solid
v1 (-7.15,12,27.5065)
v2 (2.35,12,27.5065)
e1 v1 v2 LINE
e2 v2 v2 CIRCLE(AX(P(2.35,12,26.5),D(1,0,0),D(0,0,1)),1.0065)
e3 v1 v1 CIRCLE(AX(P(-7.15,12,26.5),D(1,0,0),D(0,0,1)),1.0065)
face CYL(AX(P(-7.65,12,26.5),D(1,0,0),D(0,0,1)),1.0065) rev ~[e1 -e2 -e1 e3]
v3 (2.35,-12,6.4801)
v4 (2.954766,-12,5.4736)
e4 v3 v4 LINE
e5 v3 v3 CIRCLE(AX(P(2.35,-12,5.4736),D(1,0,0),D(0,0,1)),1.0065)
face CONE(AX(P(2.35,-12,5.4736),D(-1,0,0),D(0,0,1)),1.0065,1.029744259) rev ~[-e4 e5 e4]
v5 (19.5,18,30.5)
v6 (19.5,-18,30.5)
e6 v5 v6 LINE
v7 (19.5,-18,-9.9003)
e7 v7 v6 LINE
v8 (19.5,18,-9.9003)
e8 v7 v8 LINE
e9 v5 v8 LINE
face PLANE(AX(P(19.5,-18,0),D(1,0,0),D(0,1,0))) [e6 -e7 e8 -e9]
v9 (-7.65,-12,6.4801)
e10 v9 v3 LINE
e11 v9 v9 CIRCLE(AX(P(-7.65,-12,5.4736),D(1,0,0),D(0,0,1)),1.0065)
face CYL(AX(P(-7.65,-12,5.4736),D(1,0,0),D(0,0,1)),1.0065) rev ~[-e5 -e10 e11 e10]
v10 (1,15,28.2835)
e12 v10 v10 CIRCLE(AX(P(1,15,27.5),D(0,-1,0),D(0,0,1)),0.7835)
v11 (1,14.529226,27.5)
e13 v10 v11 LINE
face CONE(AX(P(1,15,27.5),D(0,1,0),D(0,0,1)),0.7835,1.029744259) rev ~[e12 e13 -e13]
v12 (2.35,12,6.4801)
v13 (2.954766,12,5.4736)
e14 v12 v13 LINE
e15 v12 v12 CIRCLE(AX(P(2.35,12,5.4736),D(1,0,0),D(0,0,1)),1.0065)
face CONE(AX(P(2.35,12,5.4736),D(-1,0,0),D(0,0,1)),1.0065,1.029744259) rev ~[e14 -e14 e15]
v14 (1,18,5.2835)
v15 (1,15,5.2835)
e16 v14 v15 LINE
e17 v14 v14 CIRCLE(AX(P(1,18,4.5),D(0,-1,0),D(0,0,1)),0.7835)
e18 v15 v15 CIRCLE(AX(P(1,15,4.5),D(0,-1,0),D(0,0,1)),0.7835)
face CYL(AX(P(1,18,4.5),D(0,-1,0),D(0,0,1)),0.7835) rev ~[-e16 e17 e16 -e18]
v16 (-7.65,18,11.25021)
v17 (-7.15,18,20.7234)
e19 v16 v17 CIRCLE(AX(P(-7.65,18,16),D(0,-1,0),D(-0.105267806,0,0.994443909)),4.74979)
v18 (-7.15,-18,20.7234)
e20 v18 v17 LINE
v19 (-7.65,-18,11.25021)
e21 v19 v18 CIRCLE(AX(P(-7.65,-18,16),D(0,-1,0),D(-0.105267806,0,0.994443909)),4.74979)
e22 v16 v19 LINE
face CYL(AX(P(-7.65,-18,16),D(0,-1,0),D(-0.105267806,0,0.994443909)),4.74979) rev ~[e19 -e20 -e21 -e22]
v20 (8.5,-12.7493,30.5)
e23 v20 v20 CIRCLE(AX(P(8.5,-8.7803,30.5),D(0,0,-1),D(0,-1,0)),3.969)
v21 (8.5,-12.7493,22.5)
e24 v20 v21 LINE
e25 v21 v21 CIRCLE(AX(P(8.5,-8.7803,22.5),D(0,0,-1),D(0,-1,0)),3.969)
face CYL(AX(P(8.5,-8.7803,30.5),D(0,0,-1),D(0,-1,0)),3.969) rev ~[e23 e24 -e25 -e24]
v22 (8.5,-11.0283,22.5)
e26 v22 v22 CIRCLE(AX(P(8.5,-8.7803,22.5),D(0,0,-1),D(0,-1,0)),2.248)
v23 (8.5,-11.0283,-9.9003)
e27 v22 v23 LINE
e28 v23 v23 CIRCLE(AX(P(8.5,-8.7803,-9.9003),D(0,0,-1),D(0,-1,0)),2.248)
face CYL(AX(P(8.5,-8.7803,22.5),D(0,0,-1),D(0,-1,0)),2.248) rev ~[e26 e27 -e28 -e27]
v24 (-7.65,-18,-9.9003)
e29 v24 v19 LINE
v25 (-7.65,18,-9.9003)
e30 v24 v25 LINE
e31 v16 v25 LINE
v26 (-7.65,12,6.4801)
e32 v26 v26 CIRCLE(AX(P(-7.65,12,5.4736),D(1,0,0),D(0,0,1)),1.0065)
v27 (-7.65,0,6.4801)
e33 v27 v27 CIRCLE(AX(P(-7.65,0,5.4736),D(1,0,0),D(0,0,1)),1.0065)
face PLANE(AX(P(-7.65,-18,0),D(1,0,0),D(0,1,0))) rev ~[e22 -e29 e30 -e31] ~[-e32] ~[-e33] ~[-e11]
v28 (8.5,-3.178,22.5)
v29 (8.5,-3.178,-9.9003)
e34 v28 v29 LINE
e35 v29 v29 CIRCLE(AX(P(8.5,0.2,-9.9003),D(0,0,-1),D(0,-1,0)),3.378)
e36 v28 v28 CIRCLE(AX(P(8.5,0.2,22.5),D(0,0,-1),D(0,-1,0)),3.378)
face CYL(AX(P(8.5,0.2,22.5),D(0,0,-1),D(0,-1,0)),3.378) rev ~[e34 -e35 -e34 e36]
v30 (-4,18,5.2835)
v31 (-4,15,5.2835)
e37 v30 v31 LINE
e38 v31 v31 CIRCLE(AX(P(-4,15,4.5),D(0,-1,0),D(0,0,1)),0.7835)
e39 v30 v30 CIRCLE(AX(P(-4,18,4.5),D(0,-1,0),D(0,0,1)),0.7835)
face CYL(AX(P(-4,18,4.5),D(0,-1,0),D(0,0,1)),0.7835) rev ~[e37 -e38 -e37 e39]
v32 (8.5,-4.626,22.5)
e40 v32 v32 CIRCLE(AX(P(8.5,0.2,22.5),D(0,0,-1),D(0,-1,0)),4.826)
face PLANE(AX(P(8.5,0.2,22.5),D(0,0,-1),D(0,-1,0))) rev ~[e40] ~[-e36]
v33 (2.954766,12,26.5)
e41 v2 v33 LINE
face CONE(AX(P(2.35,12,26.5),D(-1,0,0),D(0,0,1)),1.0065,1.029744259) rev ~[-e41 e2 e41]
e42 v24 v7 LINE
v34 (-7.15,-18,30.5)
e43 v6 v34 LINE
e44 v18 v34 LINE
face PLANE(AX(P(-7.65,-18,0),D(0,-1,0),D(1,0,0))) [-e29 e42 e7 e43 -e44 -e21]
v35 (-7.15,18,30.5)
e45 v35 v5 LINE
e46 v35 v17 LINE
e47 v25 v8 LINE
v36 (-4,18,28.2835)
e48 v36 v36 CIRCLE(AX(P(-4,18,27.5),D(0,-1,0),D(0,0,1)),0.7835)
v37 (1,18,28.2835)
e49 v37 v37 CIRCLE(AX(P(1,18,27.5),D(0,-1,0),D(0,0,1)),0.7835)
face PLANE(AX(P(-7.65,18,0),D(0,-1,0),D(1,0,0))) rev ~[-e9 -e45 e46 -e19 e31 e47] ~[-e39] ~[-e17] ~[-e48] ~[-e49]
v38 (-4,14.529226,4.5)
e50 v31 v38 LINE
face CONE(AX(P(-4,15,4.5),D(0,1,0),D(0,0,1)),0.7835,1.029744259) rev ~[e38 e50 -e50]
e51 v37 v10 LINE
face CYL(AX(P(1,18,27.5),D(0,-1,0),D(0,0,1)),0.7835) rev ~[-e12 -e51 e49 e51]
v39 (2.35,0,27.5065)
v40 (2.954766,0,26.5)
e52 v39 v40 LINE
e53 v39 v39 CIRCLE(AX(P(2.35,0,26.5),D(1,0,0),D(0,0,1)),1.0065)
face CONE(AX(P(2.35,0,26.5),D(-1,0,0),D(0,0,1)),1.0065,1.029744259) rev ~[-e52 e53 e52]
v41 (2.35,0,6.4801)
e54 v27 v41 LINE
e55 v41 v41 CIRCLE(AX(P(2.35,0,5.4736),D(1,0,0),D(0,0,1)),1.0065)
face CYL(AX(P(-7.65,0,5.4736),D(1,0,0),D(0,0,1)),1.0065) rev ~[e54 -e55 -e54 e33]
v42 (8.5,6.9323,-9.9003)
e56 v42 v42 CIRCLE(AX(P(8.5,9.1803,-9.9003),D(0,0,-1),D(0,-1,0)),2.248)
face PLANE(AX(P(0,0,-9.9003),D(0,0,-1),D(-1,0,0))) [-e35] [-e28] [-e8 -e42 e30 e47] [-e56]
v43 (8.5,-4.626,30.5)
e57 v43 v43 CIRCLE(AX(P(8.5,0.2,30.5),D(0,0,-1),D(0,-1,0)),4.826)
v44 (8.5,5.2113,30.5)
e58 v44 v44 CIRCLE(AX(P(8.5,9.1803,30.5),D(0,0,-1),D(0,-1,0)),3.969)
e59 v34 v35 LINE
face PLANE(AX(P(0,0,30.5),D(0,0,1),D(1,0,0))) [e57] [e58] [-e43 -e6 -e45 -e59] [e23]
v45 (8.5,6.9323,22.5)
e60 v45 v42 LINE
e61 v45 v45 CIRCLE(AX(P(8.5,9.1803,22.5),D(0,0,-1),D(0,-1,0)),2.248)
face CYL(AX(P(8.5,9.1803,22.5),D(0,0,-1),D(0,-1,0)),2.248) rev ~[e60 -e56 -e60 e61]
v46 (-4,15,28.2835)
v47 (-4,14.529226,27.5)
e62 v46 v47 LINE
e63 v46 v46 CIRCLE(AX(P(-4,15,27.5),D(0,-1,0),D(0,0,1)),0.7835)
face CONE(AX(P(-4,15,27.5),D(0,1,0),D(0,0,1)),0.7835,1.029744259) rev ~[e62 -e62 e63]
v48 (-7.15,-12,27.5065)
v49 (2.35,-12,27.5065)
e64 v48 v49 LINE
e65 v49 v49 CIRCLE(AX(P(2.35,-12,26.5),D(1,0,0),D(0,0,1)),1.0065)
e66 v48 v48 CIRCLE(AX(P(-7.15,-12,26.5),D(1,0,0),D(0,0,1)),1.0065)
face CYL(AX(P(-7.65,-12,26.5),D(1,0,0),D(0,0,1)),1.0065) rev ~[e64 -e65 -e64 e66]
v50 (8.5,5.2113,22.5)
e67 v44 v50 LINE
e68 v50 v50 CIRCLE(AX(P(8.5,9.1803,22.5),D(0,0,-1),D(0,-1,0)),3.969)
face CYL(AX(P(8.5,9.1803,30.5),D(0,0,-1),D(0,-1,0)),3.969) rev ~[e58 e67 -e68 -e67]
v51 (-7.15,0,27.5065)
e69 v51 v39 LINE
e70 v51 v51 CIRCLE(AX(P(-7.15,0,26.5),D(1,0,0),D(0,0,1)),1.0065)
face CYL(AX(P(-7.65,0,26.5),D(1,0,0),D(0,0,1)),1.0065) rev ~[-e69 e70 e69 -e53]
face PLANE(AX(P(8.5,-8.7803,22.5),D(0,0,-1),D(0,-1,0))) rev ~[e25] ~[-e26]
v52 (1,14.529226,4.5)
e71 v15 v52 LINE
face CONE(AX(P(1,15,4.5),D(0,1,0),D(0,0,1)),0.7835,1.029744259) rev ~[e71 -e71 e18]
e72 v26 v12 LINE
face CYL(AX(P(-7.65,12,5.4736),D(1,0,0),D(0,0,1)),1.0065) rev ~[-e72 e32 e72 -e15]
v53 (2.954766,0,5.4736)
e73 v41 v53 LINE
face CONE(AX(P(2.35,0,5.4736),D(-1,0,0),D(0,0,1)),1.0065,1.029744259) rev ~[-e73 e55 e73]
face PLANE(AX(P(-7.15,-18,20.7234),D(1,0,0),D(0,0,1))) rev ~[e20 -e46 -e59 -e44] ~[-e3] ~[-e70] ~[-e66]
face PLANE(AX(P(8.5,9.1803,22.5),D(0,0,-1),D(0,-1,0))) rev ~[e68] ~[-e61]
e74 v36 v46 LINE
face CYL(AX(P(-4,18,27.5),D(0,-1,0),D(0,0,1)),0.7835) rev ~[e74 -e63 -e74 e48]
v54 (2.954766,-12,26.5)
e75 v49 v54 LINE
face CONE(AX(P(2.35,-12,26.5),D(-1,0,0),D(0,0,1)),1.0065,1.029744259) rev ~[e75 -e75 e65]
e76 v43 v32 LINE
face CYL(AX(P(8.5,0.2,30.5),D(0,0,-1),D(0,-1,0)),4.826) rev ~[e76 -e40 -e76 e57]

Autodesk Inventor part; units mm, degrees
ref_plane "YZ Plane" through (0, 0, 0) normal (1, 0, 0) x (0, 1, 0)
ref_plane "XZ Plane" through (0, 0, 0) normal (0, 1, 0) x (-1, 0, 0)
ref_plane "XY Plane" through (0, 0, 0) normal (0, 0, 1) x (1, 0, 0)
sketch "Sketch1" plane through (0, 0, 0) normal (0, 0, 1) x (1, 0, 0)
  line L0 (-15.5, 18) -> (19.5, 18)
  line L1 (19.5, 18) -> (19.5, -18)
  line L2 (19.5, -18) -> (-15.5, -18)
  line L3 (-15.5, -18) -> (-15.5, 18)
  point P0 (0, 0)
  dimension "d0" = 35
  dimension "d1" = 36
  dimension "d2" = 18
  dimension "d3" = 15.5
extrude "Extrusion1" add sketch "Sketch1" along normal blind 8
sketch "Sketch2" plane through (0, 0, 8) normal (0, 0, 1) x (1, 0, 0)
  line L0 (-15.5, 18) -> (19.5, 18)
  line L1 (19.5, 18) -> (19.5, -18)
  line L2 (19.5, -18) -> (-15.5, -18)
  line L3 (-15.5, -18) -> (-15.5, 18)
  line L4 (-15.5, -18) -> (-15.5, 18) projected
  line L5 (19.5, 18) -> (19.5, -18) projected
  line L6 (-15.5, 18) -> (19.5, 18) projected
  line L7 (19.5, -18) -> (-15.5, -18) projected
  line L8 (19.5, -18) -> (19.5, 18)
  point P0 (0, 0)
  dimension "d70" = 0
  dimension "d165" = 0
extrude "Extrusion2" add sketch "Sketch2" along normal blind 22.5
sketch "Sketch3" plane through (-15.5, -18, 0) normal (0, -1, 0) x (1, 0, 0)
  line L0 (7.85, 30.5) -> (7.35, 30.5)
  line L1 (7.85, 30.5) -> (8.35, 30.5)
  line L2 (35, 0) -> (0, 0) projected
  arc A0 (7.35, 20.7234) -> (8.35, 20.7234) centre (7.85, 16) ccw
  line L3 (7.35, 30.5) -> (7.35, 20.7234)
  line L4 (8.35, 30.5) -> (8.35, 20.7234)
  line L5 (35, 0) -> (35, 30.5) projected
  line L6 (35, 30.5) -> (0, 30.5) projected
  line L7 (0, 0) -> (0, 30.5) projected
  point P0 (15.5, 0)
  dimension "d16" = 0.5
  dimension "d17" = 0.5
  dimension "d63" = 9.4996
  dimension "d65" = 16
  dimension "d105" = 1
  dimension "d188" = 7.85
  dimension "d189" = 0.5
emboss "Emboss1" sketch "Sketch3" operation cut depth 50 direction (0, 1, 0) contours L1 L4 A0 L3 L0
sketch "Sketch13" plane through (0, 0, 0) normal (0, 0, -1) x (-1, 0, 0)
  line L0 (-13, -5.3) -> (11, -5.3)
  line L1 (15.5, 18) -> (-19.5, 18) projected
  line L2 (-19.5, 18) -> (-19.5, -18) projected
  line L3 (-19.5, -18) -> (15.5, -18) projected
  line L4 (15.5, -18) -> (15.5, 18) projected
  line L5 (-19.5, 18) -> (-19.5, -18) projected
  line L6 (-19.5, -5.3) -> (15.5, -5.3)
  point P0 (0, 0)
  dimension "d190" = 12.7
extrude "Extrusion5" [suppressed]
sketch "Sketch14" plane through (-15.5, -5.3, 0) normal (0, 1, 0) x (1, 0, 0)
  line L0 (0, 32) -> (35, 32) projected
  line L1 (35, 0) -> (35, 32) projected
  point P0 (15.5, 0)
  point P1 (9.5, 30)
  point P2 (28, 30)
  point P3 (32.75, 16)
  dimension "d109" = 2
  dimension "d110" = 2
  dimension "d111" = 2.25
  dimension "d112" = 9.5
  dimension "d113" = 7
  dimension "d114" = 16
hole "Press fit for D2mm_L5mm Dowel - pin to protrude 2mm" [suppressed]
sketch "Sketch21" plane through (0, 0, 0) normal (0, 0, -1) x (-1, 0, 0)
  circle A0 centre (-3.75, 0.2) radius 3
  circle A1 centre (-3.75, 0.2) radius 3 construction
  point P0 (0, 0)
  dimension "d185" = 6
sketch "Sketch22" plane through (-15.5, -18, 30.5) normal (-1, 0, 0) x (0, 0, 1)
  line L0 (-30.5, 36) -> (0, 36) projected
  line L1 (-30.5, 0) -> (-30.5, 36) projected
  line L2 (-30.5, 0) -> (0, 0) projected
  line L3 (0, 0) -> (0, 36) projected
  point P0 (-30.5, 18)
  point P1 (-4, 30)
  point P2 (-4, 18)
  point P3 (-4, 6)
  dimension "d191" = 4
  dimension "d192" = 4
  dimension "d193" = 4
  dimension "d194" = 6
  dimension "d195" = 6
  dimension "d196" = 18
hole "CBore for M2.5 screw" [suppressed]
sketch "Sketch24" plane through (-7.65, -18, 16) normal (0, -1, 0) x (1, 0, 0)
  circle A0 centre (21.4, -42.5) radius 0.7835
  circle A1 centre (21.4, -22.5) radius 0.7835
  circle A2 centre (1.4, -42.5) radius 0.7835
  circle A3 centre (1.4, -22.5) radius 0.7835
  point P0 (7.65, -16)
hole "CBore for M2 screw" [suppressed]
sketch "Sketch25" plane through (-7.65, -18, 16) normal (0, -1, 0) x (1, 0, 0)
  line L0 (-0.5, 4.7234) -> (-0.5, 14.5) projected
  line L1 (-0.5, 14.5) -> (-7.85, 14.5) projected
  line L2 (-7.85, -16) -> (-7.85, 14.5) projected
  line L3 (27.15, -16) -> (27.15, 14.5) projected
  line L4 (27.15, 14.5) -> (0.5, 14.5) projected
  line L5 (0.5, 14.5) -> (0.5, 4.7234) projected
  arc A0 (-0.5, 4.7234) -> (0.5, 4.7234) centre (0, 0) ccw projected
  line L6 (27.15, -48) -> (-7.85, -48) projected
  circle A1 centre (1.4, -42.5) radius 2.2 projected
  circle A2 centre (21.4, -42.5) radius 1.2 projected
  line L7 (1.4, -42.5) -> (21.4, -42.5) construction
  line L8 (11.4, -42.5) -> (11.4, 14.5) construction
  line L9 (0.5, 14.5) -> (27.15, 14.5) projected
  line L10 (27.15, -16) -> (-7.85, -16) projected
  point P0 (7.65, -16)
  point P1 (11.4, -23)
  point P2 (11.4, -40)
hole "Threaded hole for M2 screw" [suppressed]
sketch "Sketch27" plane through (-15.5, 18, 0) normal (0, 1, 0) x (1, 0, 0)
  arc A0 (8.35, -20.7234) -> (7.35, -20.7234) centre (7.85, -16) ccw projected
  line L0 (7.35, -30.5) -> (7.35, -20.7234) projected
  arc A1 (8.35, -20.7234) -> (7.35, -20.7234) centre (7.85, -16) ccw projected
  line L1 (8.35, -20.7234) -> (8.35, -30.5) projected
  line L2 (8.35, -30.5) -> (35, -30.5) projected
  line L3 (35, 0) -> (35, -30.5) projected
  line L4 (0, 0) -> (35, 0) projected
  line L5 (0, 0) -> (0, -30.5) projected
  line L6 (0, -30.5) -> (7.35, -30.5) projected
  line L7 (7.85, -16) -> (7.85, -30.5)
  line L8 (7.85, -30.5) -> (0, -30.5)
  line L9 (0, -30.5) -> (0, 0)
  line L10 (0, 0) -> (7.85, 0)
  line L11 (7.85, 0) -> (7.85, -16)
  point P0 (15.5, 0)
extrude "Extrusion7" cut sketch "Sketch27" against normal through all contours L11 L7 L8 L0 A0 | A0 L0 L6 L5 L4 L11
sketch "Sketch23" plane through (-7.65, -18, 20.7234) normal (-1, 0, 0) x (0, 0, 1)
  line L0 (0, 0) -> (-9.4732, 0) construction
  line L1 (-9.4732, 36) -> (0, 36) construction
  line L2 (-4.7366, 0) -> (-4.7366, 36) construction
  point P0 (-20.7234, 18)
  point P1 (5.7766, 30)
  point P2 (5.7766, 18)
  point P3 (5.7766, 6)
  point P4 (-15.2498, 30)
  point P5 (-15.2498, 18)
  point P6 (-15.2498, 6)
  point P7 (5.7766, 30)
  point P8 (5.7766, 18)
  point P9 (5.7766, 6)
  dimension "d227" = 10.5132
  dimension "d228" = 10.5132
  dimension "d229" = 10.5132
  dimension "d230" = 10.5132
  dimension "d231" = 10.5132
  dimension "d232" = 10.5132
  dimension "d233" = 6
  dimension "d234" = 6
  dimension "d235" = 18
  dimension "d236" = 30
  dimension "d237" = 18
  dimension "d238" = 30
hole "Threaded hole for M2.5 screw" at (-7.65, 12, 26.5) at (-7.65, 0, 26.5) at (-7.65, -12, 26.5) at (-7.65, 12, 5.4736) at (-7.65, 0, 5.4736) at (-7.65, -12, 5.4736) direction (1, 0, 0) diameter 2.013 depth 10 tip angle 118 thread size "M2.5x0.45" class "6H" standard "ANSI Metric M Profile"
sketch "Sketch29" plane through (19.5, 18, 30.5) normal (0, 1, 0) x (1, 0, 0)
  arc A0 (-26.65, 9.7766) -> (-27.15, 19.2498) centre (-27.15, 14.5) ccw projected
  point P0 (-19.5, 30.5)
  point P1 (-23.5, 3)
  point P2 (-18.5, 3)
  point P3 (-23.5, 26)
  point P4 (-18.5, 26)
  dimension "d241" = 11.5
  dimension "d242" = 11.5
  dimension "d243" = 11.5
  dimension "d244" = 11.5
  dimension "d245" = 3.65
  dimension "d246" = 3.65
  dimension "d247" = 8.65
  dimension "d248" = 8.65
hole "Hole18" at (-4, 18, 27.5) at (1, 18, 27.5) at (-4, 18, 4.5) at (1, 18, 4.5) direction (0, -1, 0) diameter 1.567 depth 3 tip angle 118 thread size "M2x0.4" class "6H" standard "ANSI Metric M Profile"
sketch "Sketch31" plane through (0, 0, 0) normal (0, 0, -1) x (-1, 0, 0)
  line L0 (7.65, 18) -> (-19.5, 18) projected
  line L1 (7.65, -18) -> (7.65, 18) projected
  line L2 (-19.5, 18) -> (7.65, 18)
  line L3 (7.65, 18) -> (7.65, -18)
  line L4 (7.65, -18) -> (-19.5, -18)
  line L5 (-19.5, -18) -> (-19.5, 18)
  line L6 (-19.5, 18) -> (7.65, 18)
  line L7 (7.65, 18) -> (7.65, -18)
  line L8 (7.65, -18) -> (-19.5, -18)
  line L9 (-19.5, -18) -> (-19.5, 18)
  point P0 (0, 0)
extrude "Extrusion8" add sketch "Sketch31" along normal blind 9.9003
hole "Hole19" [suppressed]
sketch "Sketch30" plane through (0, 0, 30.5) normal (0, 0, 1) x (1, 0, 0)
  circle A0 centre (8.5, 0.2) radius 3
  line L0 (19.5, 18) -> (19.5, -18) projected
  line L1 (-7.15, 18) -> (19.5, 18) projected
  circle A1 centre (8.5, 9.1803) radius 1.1674
  circle A2 centre (8.5, -8.7803) radius 1.2033
  point P0 (0, 0)
  dimension "d263" = 6
  dimension "d264" = 11
  dimension "d265" = 17.8
  dimension "d273" = 8.9803
  dimension "d274" = 8.9803
hole "Hole20" at (8.5, 0.2, 30.5) direction (0, 0, -1) diameter 6.756 end through all counterbore diameter 9.652 counterbore depth 8 clearance for "Hex Head Bolt" size "1/4" standard "Ansi Unified Screw Threads"
hole "Hole21" at (8.5, 9.1803, 30.5) direction (0, 0, -1) diameter 4.496 end through all counterbore diameter 7.938 counterbore depth 8 clearance for "Socket Head Cap Screw" size "#8" standard "Ansi Unified Screw Threads"
hole "Hole22" at (8.5, -8.7803, 30.5) direction (0, 0, -1) diameter 4.496 end through all counterbore diameter 7.938 counterbore depth 8 clearance for "Socket Head Cap Screw" size "#8" standard "Ansi Unified Screw Threads"
equation "\"d2\" = 0.5 * d1"
equation "\"d230\" = d229"
equation "\"d231\" = d228"
equation "\"d232\" = d227"
equation "\"d233\" = d234"
equation "\"d237\" = d235"
equation "\"d238\" = d236"
properties part number "zgalvo_to_newport_stage" material "ALUMINUM, 6061-T651"
